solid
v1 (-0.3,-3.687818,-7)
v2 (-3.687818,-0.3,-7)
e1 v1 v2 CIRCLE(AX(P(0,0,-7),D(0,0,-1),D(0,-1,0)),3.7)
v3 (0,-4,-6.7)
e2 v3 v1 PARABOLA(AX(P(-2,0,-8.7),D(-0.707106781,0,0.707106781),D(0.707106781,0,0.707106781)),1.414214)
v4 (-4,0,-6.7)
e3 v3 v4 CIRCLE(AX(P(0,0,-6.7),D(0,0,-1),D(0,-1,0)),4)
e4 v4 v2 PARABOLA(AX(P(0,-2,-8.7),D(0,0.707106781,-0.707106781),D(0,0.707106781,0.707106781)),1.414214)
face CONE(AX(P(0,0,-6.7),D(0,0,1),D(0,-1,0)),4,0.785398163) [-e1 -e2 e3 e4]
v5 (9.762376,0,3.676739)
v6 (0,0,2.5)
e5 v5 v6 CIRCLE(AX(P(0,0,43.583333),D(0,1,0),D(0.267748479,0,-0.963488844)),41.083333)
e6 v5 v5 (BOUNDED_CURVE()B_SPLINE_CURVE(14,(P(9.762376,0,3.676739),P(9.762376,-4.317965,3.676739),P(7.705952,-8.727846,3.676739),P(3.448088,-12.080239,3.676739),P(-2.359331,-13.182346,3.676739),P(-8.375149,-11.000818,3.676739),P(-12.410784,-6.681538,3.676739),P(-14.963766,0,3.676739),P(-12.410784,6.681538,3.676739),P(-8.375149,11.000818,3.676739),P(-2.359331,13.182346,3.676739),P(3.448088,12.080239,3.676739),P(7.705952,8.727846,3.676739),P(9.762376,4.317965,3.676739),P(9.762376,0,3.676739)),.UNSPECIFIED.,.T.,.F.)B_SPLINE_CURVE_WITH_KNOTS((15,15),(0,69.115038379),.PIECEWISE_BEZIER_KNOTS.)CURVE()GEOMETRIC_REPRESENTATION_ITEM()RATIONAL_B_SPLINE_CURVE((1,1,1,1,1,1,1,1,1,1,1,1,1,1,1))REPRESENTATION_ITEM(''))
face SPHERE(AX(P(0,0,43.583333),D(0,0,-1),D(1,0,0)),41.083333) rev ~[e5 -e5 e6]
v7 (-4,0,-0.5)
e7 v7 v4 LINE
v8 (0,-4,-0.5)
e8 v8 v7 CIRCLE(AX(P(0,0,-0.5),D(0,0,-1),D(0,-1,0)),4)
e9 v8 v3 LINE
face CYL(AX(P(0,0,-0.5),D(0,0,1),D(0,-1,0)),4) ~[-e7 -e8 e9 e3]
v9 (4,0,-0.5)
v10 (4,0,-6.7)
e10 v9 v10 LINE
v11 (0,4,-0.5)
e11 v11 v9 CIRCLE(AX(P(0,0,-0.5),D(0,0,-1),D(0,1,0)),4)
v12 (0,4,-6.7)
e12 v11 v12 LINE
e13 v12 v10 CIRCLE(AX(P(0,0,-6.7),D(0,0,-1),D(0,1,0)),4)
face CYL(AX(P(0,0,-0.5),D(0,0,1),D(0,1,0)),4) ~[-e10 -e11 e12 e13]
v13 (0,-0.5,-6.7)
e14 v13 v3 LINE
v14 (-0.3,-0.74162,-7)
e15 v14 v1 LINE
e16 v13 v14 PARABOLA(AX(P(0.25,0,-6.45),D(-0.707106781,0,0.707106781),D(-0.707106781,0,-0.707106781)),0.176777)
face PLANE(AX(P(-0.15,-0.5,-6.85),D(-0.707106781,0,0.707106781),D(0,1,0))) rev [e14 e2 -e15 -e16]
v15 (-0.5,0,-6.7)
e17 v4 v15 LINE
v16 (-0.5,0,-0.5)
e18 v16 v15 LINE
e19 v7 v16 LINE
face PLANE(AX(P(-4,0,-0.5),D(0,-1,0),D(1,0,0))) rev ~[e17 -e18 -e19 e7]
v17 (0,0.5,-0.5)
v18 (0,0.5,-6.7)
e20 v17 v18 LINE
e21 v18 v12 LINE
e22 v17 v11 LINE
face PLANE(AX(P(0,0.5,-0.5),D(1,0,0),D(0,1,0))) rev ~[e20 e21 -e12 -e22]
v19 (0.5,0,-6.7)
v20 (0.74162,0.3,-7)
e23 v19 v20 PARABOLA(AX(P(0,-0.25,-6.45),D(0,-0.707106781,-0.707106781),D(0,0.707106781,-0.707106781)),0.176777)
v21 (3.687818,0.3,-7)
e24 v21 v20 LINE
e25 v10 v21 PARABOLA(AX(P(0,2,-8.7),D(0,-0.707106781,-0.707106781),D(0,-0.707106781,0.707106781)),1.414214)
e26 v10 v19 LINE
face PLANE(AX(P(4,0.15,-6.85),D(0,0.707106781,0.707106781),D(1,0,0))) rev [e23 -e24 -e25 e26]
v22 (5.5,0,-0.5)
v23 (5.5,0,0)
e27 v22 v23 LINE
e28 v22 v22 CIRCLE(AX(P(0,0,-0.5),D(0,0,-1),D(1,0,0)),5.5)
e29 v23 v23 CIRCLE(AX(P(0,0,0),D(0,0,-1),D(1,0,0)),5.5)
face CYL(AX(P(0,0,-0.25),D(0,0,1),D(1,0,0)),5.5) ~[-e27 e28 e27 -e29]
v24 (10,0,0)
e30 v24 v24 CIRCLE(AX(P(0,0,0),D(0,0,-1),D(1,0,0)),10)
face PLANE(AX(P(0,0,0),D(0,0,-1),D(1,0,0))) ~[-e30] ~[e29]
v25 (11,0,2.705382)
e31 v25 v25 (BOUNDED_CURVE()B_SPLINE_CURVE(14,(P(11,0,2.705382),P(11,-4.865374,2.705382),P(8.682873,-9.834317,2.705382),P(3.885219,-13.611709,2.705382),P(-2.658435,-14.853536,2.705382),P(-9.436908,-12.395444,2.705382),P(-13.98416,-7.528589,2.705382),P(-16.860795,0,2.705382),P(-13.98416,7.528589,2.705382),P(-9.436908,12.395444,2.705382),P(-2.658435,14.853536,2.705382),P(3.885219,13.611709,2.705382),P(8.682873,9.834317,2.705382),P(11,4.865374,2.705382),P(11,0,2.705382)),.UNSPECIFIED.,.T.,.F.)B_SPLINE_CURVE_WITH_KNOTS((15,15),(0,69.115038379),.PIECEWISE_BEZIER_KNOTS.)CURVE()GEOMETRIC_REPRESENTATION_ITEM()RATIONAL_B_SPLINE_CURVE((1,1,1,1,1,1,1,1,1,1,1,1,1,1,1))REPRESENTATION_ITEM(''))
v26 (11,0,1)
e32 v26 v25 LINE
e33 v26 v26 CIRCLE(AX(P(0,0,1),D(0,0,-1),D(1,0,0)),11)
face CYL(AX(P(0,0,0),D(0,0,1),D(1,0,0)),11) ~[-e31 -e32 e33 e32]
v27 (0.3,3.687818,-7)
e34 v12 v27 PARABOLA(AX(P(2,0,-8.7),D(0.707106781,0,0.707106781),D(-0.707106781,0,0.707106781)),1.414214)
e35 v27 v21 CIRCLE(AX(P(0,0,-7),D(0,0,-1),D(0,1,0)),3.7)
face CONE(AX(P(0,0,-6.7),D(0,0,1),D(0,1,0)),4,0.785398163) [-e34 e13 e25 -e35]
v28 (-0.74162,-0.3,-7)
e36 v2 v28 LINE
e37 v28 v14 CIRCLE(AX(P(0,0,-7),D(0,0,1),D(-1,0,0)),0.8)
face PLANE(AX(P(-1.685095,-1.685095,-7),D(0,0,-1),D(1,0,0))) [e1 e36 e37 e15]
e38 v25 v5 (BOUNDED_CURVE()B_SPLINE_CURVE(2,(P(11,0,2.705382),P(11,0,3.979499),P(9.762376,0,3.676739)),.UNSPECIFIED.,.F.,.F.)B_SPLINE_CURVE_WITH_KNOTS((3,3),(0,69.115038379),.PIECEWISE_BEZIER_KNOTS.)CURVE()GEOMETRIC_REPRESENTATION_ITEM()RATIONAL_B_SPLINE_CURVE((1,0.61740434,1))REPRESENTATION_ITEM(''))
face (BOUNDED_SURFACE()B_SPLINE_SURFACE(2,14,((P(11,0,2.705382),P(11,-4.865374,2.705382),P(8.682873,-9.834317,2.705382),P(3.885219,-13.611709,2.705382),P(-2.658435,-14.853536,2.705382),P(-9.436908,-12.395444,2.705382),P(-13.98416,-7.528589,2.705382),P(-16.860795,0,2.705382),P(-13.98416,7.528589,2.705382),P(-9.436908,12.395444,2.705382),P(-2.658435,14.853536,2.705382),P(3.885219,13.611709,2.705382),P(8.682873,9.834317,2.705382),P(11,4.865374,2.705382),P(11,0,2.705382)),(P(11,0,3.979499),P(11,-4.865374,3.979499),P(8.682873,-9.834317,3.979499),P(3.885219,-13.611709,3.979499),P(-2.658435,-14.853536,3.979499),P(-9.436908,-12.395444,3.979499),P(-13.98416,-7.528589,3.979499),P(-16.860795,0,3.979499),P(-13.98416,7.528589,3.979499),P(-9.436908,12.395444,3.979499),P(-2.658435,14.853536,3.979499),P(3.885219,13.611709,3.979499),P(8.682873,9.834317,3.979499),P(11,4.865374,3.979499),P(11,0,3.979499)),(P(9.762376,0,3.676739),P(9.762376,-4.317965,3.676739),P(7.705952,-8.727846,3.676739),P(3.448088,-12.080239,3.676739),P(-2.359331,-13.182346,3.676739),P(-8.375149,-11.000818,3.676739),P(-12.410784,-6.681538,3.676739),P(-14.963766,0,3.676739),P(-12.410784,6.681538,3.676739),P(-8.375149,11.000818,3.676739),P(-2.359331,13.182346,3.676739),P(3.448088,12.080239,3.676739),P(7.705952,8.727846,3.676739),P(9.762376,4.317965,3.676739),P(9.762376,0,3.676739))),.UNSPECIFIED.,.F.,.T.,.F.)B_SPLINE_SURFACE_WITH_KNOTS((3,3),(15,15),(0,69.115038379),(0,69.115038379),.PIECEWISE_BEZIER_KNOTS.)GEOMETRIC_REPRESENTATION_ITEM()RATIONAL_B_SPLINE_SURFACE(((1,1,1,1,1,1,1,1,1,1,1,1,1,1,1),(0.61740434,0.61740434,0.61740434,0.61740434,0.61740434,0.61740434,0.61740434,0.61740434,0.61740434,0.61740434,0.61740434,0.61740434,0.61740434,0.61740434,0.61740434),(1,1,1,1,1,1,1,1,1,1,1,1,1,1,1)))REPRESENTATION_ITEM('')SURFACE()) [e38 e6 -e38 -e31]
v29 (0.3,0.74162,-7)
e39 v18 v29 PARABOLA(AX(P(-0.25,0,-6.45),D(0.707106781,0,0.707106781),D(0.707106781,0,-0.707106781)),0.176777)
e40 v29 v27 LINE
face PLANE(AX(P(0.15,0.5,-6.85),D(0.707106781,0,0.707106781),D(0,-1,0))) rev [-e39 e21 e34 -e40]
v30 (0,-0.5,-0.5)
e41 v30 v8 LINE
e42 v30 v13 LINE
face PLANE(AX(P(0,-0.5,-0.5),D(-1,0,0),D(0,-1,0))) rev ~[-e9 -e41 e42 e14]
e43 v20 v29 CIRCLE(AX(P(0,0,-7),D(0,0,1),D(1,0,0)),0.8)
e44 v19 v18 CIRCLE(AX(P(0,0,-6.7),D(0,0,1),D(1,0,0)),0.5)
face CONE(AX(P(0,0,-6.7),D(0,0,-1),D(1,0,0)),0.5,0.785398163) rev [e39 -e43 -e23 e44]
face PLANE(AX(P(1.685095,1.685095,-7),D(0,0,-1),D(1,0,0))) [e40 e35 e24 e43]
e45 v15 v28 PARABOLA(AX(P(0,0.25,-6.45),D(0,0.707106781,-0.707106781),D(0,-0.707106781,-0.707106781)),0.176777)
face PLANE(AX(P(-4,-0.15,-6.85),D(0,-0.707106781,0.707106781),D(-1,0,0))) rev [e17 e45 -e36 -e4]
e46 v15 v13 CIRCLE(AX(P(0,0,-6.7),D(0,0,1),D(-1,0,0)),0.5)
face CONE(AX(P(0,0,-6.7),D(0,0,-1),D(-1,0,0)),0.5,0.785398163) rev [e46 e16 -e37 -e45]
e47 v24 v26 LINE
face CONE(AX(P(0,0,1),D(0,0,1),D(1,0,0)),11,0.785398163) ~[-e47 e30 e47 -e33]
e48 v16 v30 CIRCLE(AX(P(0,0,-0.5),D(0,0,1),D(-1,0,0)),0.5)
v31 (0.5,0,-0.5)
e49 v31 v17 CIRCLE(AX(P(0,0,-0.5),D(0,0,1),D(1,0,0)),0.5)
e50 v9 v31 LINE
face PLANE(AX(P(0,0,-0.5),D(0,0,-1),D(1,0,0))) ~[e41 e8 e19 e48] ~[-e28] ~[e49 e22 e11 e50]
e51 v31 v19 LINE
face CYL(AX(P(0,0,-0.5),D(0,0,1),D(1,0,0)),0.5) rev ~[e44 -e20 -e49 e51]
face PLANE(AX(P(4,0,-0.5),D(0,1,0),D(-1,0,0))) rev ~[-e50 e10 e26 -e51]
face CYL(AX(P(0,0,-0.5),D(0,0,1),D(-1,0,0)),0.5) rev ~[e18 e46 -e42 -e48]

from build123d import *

# Parameters (mm, degrees)
F0_W     = 5.5
F0_H     = 0.5
F2_SIZE  = 1
F3_R     = 1
F5_DEPTH = 6.5
F6_SIZE  = 0.3


with BuildPart() as f1:
    # F0 (on Front) → F1 (revolve)
    with BuildSketch(Plane.XZ):
        with BuildLine():
            ThreePointArc((11, 4), (5.5509008278, 2.8767272628), (0, 2.5))
            Line((0, 2.5), (0, 0))
            Line((0, 0), (5.5, 0))
            Line((5.5, 0), (11, 0))
            Line((11, 0), (11, 4))
        make_face()
        with Locations((2.75, -0.25)):
            Rectangle(F0_W, F0_H)
    revolve(axis=Axis((0, 0, 1.25), (0, 0, -1)))

    # F2
    f2_edges = [f1.edges().sort_by_distance(p)[0] for p in [
        (-11, 0, 0),
    ]]
    chamfer(f2_edges, length=F2_SIZE)

    # F3
    f3_edges = [f1.edges().sort_by_distance(p)[0] for p in [
        (-11, 0, 4),
    ]]
    fillet(f3_edges, radius=F3_R)

    # F4 (on face) → F5 (join)
    with BuildSketch(Plane(origin=(0, 0, -0.5), x_dir=(1, 0, 0), z_dir=(0, 0, -1))):
        with BuildLine():
            ThreePointArc((-0.5, 0), (-0.3535533906, 0.3535533906), (0, 0.5))
            Line((0, 0.5), (0, 4))
            ThreePointArc((0, 4), (-2.8284271247, 2.8284271247), (-4, 0))
            Line((-4, 0), (-0.5, 0))
        make_face()
        with BuildLine():
            Line((4, 0), (0.5, 0))
            ThreePointArc((0.5, 0), (0.3535533906, -0.3535533906), (0, -0.5))
            Line((0, -0.5), (0, -4))
            ThreePointArc((0, -4), (2.8284271247, -2.8284271247), (4, 0))
        make_face()
    extrude(amount=F5_DEPTH)

    # F6
    f6_edges = [f1.edges().sort_by_distance(p)[0] for p in [
        (0, -2.25, -7),
        (-2.828427, -2.828427, -7),
        (-2.25, 0, -7),
        (-0.353553, -0.353553, -7),
        (0.353553, 0.353553, -7),
        (2.25, 0, -7),
        (2.828427, 2.828427, -7),
        (0, 2.25, -7),
    ]]
    chamfer(f6_edges, length=F6_SIZE)


solid = f1.part
